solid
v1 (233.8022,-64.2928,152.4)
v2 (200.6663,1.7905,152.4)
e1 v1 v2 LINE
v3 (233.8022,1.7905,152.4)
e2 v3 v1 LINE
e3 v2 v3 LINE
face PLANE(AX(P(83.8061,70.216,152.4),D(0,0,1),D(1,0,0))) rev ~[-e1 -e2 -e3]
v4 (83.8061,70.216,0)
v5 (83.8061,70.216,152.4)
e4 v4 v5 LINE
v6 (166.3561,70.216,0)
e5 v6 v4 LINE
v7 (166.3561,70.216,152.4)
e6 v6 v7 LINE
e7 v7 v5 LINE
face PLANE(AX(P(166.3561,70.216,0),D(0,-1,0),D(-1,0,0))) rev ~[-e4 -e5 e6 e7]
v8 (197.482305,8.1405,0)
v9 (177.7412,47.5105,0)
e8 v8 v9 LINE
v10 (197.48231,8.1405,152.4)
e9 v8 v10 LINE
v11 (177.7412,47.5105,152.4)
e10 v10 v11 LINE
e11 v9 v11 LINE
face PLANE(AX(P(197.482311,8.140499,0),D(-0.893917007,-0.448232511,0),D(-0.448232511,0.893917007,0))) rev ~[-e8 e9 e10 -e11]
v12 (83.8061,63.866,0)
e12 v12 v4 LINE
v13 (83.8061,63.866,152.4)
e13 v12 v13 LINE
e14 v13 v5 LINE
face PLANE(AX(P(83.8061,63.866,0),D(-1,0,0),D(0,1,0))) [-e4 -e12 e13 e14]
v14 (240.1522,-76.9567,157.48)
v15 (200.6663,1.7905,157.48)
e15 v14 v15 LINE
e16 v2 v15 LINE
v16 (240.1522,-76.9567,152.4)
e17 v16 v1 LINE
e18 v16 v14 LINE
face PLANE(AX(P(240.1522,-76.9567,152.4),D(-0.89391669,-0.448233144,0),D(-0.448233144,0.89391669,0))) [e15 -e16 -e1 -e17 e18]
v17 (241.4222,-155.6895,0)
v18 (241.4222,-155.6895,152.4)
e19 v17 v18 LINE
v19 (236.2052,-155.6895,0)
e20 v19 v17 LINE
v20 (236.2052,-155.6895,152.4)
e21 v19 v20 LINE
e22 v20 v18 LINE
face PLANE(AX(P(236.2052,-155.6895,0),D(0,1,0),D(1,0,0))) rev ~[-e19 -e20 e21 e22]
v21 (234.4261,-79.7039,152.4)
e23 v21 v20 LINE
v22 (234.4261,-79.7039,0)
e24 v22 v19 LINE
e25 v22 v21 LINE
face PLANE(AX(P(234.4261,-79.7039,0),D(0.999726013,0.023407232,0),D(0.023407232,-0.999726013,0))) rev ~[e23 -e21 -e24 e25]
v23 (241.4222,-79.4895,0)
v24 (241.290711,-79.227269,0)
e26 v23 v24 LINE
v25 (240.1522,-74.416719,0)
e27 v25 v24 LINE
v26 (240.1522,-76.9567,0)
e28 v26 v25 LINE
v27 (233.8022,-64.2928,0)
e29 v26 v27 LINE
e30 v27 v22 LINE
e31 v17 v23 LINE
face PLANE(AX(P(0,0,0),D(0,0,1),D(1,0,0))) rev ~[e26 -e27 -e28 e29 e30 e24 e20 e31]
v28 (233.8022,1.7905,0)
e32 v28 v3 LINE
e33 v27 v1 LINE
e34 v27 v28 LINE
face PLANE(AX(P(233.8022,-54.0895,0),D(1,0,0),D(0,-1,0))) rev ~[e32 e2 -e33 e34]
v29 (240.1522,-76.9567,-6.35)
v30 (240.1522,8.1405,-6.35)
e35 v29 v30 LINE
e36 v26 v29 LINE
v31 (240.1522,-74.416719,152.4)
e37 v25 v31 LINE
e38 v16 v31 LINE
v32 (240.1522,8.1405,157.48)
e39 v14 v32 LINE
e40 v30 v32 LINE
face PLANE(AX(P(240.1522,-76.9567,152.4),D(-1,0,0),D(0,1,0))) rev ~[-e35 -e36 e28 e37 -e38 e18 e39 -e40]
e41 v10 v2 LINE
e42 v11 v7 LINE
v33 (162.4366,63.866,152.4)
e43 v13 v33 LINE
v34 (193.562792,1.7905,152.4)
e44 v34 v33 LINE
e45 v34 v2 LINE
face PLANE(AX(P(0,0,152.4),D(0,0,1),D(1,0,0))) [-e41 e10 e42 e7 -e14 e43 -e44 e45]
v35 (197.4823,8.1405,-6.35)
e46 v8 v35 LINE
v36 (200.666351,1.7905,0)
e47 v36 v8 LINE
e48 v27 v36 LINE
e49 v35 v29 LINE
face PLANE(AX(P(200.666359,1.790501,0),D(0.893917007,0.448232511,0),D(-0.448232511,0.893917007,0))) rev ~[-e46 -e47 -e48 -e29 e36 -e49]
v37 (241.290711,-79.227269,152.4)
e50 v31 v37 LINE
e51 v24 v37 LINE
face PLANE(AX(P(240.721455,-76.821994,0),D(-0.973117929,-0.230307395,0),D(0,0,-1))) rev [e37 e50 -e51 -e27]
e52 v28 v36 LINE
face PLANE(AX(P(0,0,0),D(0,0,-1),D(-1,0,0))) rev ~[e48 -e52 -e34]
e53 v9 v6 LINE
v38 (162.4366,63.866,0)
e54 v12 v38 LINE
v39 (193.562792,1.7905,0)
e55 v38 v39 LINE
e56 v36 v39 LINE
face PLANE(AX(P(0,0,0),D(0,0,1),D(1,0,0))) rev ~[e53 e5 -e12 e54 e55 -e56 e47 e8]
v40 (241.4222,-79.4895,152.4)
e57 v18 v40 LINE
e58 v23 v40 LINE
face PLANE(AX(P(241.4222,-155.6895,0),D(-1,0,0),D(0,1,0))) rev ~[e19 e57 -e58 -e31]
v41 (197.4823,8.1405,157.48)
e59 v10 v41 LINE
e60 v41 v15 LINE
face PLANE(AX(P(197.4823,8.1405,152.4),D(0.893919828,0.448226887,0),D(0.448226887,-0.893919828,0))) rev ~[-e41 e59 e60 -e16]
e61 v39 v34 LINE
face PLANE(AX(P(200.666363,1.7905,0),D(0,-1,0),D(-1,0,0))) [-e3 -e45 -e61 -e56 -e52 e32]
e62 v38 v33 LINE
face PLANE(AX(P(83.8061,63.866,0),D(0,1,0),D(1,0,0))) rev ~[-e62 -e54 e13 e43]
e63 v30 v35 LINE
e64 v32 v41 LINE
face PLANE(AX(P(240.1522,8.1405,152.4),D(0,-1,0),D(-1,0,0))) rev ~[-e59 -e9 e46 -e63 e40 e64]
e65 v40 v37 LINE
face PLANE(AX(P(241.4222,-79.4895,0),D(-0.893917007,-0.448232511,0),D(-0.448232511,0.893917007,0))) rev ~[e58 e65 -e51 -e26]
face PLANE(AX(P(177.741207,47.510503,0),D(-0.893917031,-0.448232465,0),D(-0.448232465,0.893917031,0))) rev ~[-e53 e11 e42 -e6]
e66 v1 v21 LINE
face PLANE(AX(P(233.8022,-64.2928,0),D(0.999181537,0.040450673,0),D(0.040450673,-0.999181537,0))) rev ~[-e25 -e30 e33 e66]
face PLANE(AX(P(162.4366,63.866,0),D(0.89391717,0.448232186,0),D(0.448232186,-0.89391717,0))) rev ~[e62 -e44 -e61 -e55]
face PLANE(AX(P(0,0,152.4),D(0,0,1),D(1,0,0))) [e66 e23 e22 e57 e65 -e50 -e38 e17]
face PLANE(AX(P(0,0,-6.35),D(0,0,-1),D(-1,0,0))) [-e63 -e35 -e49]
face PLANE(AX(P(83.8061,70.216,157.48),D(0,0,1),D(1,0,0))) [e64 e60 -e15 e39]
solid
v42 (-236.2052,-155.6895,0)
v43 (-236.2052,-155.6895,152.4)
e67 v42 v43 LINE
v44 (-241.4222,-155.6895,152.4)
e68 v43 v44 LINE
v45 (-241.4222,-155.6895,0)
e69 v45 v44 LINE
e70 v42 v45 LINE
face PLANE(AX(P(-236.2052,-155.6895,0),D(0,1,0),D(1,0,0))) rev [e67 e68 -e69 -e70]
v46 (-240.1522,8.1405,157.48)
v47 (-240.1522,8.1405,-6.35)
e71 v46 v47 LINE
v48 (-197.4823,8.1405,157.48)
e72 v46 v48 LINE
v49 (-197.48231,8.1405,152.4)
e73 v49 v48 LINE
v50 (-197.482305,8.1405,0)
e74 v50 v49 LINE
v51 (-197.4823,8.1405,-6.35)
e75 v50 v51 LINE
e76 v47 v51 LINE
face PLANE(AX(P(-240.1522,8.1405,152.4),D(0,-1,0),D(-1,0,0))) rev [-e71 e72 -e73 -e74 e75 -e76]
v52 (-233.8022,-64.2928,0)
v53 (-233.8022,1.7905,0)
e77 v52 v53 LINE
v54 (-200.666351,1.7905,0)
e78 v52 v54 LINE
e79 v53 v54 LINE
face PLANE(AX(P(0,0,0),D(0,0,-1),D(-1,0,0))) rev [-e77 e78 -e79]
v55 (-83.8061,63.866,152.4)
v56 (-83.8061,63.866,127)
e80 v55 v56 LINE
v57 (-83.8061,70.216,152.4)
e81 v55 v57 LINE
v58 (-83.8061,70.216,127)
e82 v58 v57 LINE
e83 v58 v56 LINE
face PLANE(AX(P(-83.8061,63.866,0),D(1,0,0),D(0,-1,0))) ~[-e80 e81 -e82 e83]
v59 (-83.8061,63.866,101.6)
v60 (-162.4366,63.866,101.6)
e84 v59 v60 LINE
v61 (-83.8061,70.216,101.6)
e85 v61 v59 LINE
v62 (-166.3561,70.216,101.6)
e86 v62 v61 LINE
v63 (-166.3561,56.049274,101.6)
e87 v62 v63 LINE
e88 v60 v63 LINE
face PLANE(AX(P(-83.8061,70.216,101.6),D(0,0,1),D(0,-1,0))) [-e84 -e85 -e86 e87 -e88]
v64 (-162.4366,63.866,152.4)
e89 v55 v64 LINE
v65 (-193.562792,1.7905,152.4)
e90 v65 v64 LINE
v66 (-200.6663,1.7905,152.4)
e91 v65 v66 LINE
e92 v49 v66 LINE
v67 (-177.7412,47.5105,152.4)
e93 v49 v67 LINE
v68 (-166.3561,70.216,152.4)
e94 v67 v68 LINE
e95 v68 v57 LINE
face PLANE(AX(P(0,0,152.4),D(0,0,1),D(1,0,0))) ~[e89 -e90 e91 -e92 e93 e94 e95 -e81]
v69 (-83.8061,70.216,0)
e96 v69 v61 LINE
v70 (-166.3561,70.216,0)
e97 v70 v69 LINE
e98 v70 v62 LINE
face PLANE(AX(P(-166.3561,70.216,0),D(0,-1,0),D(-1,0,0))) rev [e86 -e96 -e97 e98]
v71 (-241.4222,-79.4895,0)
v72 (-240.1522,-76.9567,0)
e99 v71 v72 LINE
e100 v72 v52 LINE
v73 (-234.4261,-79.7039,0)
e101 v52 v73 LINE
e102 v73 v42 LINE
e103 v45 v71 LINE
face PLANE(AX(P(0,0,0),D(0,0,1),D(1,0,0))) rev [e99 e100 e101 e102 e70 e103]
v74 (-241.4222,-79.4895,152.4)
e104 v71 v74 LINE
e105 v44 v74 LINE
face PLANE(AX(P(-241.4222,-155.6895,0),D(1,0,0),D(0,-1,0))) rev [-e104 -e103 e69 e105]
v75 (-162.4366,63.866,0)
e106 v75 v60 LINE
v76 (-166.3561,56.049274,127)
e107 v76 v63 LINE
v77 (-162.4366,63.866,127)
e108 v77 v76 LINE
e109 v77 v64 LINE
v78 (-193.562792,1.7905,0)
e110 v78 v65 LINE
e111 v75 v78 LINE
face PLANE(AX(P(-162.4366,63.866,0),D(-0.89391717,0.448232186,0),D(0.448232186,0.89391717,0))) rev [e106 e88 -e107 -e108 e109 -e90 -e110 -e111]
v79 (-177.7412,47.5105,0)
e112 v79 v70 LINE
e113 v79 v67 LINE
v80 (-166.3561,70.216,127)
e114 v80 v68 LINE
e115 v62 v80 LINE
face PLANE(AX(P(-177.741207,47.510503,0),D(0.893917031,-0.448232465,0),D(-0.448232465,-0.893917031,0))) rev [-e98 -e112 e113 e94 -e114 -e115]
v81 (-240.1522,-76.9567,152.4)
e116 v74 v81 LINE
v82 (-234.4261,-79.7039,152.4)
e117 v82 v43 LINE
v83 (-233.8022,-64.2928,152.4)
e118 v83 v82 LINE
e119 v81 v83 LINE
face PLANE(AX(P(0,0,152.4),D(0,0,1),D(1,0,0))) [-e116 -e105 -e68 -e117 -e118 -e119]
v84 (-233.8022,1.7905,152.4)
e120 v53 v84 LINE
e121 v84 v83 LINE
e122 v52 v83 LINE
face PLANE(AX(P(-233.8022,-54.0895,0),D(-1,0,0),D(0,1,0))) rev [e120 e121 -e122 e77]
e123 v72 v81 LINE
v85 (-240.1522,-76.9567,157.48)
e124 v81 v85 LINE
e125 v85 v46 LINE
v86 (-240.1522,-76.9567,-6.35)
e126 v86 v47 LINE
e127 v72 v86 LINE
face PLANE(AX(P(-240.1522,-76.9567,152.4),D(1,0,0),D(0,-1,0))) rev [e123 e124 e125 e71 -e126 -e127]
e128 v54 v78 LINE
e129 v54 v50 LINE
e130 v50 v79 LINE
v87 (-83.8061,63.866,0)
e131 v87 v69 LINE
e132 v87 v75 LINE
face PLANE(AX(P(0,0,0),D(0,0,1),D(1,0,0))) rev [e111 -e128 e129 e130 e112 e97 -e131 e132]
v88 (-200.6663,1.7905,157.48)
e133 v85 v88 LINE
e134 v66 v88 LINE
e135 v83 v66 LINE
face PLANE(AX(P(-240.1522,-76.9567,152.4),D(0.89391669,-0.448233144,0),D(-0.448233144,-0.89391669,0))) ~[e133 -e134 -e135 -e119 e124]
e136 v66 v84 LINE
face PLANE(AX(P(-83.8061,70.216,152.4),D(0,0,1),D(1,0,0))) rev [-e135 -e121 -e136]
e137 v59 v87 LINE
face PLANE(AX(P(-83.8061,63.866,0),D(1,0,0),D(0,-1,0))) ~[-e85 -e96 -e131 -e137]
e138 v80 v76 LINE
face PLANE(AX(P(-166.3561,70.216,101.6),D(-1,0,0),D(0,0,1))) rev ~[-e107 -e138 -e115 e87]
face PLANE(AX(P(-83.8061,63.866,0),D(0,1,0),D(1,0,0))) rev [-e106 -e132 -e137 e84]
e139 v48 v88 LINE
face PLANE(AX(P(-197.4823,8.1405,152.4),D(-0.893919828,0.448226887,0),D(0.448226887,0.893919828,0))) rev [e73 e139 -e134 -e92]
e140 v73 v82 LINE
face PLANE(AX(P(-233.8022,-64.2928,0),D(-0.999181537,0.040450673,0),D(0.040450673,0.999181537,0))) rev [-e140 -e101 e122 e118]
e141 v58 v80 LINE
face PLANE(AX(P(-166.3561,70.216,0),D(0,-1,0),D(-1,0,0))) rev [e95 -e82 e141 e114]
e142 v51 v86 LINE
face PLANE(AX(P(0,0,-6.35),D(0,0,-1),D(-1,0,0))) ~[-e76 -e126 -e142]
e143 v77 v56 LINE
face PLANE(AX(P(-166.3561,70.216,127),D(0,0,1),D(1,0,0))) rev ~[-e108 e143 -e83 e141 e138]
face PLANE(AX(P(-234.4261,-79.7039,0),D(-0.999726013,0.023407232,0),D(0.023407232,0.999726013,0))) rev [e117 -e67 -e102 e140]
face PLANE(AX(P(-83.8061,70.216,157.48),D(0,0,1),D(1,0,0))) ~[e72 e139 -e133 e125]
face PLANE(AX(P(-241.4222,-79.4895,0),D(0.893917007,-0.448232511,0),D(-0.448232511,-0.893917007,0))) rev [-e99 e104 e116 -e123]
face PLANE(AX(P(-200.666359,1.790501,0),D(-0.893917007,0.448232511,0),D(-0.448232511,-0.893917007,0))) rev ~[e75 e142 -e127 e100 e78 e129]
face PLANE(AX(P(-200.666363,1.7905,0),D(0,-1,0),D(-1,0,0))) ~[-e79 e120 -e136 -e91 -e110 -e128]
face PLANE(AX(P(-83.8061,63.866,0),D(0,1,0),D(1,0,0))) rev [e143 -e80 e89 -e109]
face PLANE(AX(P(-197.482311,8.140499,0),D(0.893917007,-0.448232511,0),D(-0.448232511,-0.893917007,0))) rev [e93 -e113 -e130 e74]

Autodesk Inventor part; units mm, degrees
ref_plane "YZ Plane" through (0, 0, 0) normal (1, 0, 0) x (0, 1, 0)
ref_plane "Work Plane2" through (0, 0, 0) normal (0, 0, 1) x (1, 0, 0)
sketch "Sketch2" plane through (0, 0, 0) normal (0, 0, 1) x (1, 0, 0)
  line L0 (162.4366, 63.866) -> (234.4261, -79.7039) projected
  line L1 (241.4222, -79.4895) -> (177.7412, 47.5105) projected
  line L2 (-228.4778, -3.2895) -> (228.7222, -3.2895) projected
  line L3 (228.7222, -3.2895) -> (228.7222, -54.0895) projected
  line L4 (-228.4778, -3.2895) -> (-228.4778, -54.0895) projected
  line L5 (241.4222, -155.6895) -> (241.4222, -79.4895) projected
  line L6 (241.4222, -79.4895) -> (166.3561, 70.216) projected
  line L7 (166.3561, 70.216) -> (77.4561, 70.216) projected
  line L8 (77.4561, 70.216) -> (77.4561, 47.5105) projected
  line L9 (77.4561, 47.5105) -> (-77.2118, 47.5105) projected
  line L10 (-77.2118, 47.5105) -> (-77.2118, 70.216) projected
  line L11 (-77.2118, 70.216) -> (-166.1118, 70.216) projected
  line L12 (-166.1118, 70.216) -> (-241.1778, -79.4895) projected
  line L13 (-241.1778, -79.4895) -> (-241.1778, -155.6895) projected
  line L14 (-241.1778, -155.6895) -> (-233.8379, -155.6895) projected
  line L15 (-233.8379, -155.6895) -> (-231.9549, -75.263) projected
  line L16 (-231.9549, -75.263) -> (-162.1922, 63.866) projected
  line L17 (-162.1922, 63.866) -> (-83.5618, 63.866) projected
  line L18 (-83.5618, 63.866) -> (-83.5618, 41.1605) projected
  line L19 (-83.5618, 41.1605) -> (83.8061, 41.1605) projected
  line L20 (83.8061, 41.1605) -> (83.8061, 63.866) projected
  line L21 (83.8061, 63.866) -> (162.4366, 63.866) projected
  line L22 (162.4366, 63.866) -> (234.4261, -79.7039) projected
  line L23 (234.4261, -79.7039) -> (236.2052, -155.6895) projected
  line L24 (236.2052, -155.6895) -> (241.4222, -155.6895) projected
  line L25 (233.8022, -54.0895) -> (233.8022, 1.7905)
  line L26 (233.8022, 1.7905) -> (-233.5578, 1.7905)
  line L27 (-233.5578, 1.7905) -> (-233.5578, -54.0895)
  line L28 (240.1522, -54.0895) -> (240.1522, 8.1405)
  line L29 (240.1522, 8.1405) -> (-239.9078, 8.1405)
  line L30 (-239.9078, 8.1405) -> (-239.9078, -54.0895)
  line L31 (233.8022, -54.0895) -> (233.8022, -64.2928)
  line L32 (240.1522, -54.0895) -> (240.1522, -76.9567)
  line L33 (233.8022, -64.2928) -> (234.0782, -64.8433)
  line L34 (240.1522, -76.9567) -> (241.4222, -79.4895)
  line L35 (241.4222, -79.4895) -> (241.4222, -155.6895)
  line L36 (241.4222, -155.6895) -> (236.2052, -155.6895)
  line L37 (236.2052, -155.6895) -> (234.4261, -79.7039)
  line L38 (233.8022, -64.2928) -> (234.4261, -79.7039)
  line L39 (83.8061, 63.866) -> (83.8061, 70.216)
  point P0 (0, 0)
  point P1 (197.4823, 8.1405)
  point P2 (193.5628, 1.7905)
  dimension "d0" = 5.08
  dimension "d1" = 6.35
ref_plane "Work Plane3" through (-241.1778, -155.6895, 152.4) normal (0, 0, -1) x (0, 1, 0)
extrude "Extrusion1" add sketch "Sketch2" along normal up to surface (152.4 mm away) contours L21 L39 L7 L6 L1 L29 L0 | L29 L1 L26 L0 | L29 L28 L32 L1 L31 L25 L26 | L38 L1 L5 L24 L23
sketch "Sketch3" plane through (83.8061, 70.216, 152.4) normal (0, 0, 1) x (1, 0, 0)
  line L0 (156.3461, -62.0755) -> (113.6762, -62.0755) projected
  line L1 (156.3461, -147.1727) -> (156.3461, -62.0755) projected
  line L2 (113.6762, -62.0755) -> (156.3461, -62.0755)
  line L3 (157.6161, -149.7055) -> (156.3461, -147.1727) projected
  line L4 (156.3461, -62.0755) -> (156.3461, -147.1727)
  line L5 (156.3461, -147.1727) -> (116.8602, -68.4255)
  line L6 (109.7567, -68.4255) -> (149.9961, -68.4255) projected
  line L7 (113.6762, -62.0755) -> (116.8602, -68.4255)
  point P0 (-83.8061, -70.216)
extrude "Extrusion2" add sketch "Sketch3" along normal blind 5.08
sketch "Sketch4" plane through (0, 0, 0) normal (0, 0, -1) x (-1, 0, 0)
  line L0 (-240.1522, 8.1405) -> (-197.4823, 8.1405) projected
  line L1 (-240.1522, -76.9567) -> (-240.1522, 8.1405) projected
  line L2 (-233.8022, 1.7905) -> (-233.8022, -64.2928) projected
  line L3 (-241.4222, -79.4895) -> (-177.7412, 47.5105) projected
  line L4 (-193.5628, 1.7905) -> (-233.8022, 1.7905) projected
  line L5 (-241.4222, -79.4895) -> (-177.7412, 47.5105) projected
  line L6 (-240.1522, -76.9567) -> (-197.4823, 8.1405)
  line L7 (-240.1522, 8.1405) -> (-197.4823, 8.1405)
  line L8 (-240.1522, 8.1405) -> (-240.1522, -76.9567)
  point P0 (0, 0)
extrude "Extrusion3" add sketch "Sketch4" along normal blind 6.35
chamfer "Chamfer2" distance 2.54 angle 45 1 edges at (240.1522, -76.9567, 76.2)
mirror "Mirror1" about plane through (0, 0, 0) normal (1, 0, 0) of "Extrusion1", "Extrusion3", "Extrusion2"
sketch "Sketch5" plane through (-166.3561, 70.216, 0) normal (0, 1, 0) x (1, 0, 0)
  line L0 (82.55, 0) -> (82.55, -152.4) projected
  line L1 (82.55, -98.2218) -> (122.6635, -98.2218)
  line L2 (122.6635, -98.2218) -> (122.6635, -130.3782)
  line L3 (122.6635, -130.3782) -> (82.55, -130.3782)
  line L4 (82.55, -130.3782) -> (82.55, -98.2218)
  line L5 (21.7357, -104.5718) -> (47.1357, -104.5718) projected
  line L6 (21.7357, -124.0282) -> (47.1357, -124.0282) projected
  point P0 (166.3561, 0)
  dimension "d14" = 6.35
  dimension "d15" = 6.35
extrude "Extrusion5" cut sketch "Sketch5" against normal blind 50.8
sketch "Sketch6" plane through (-166.3561, 70.216, 0) normal (0, 1, 0) x (1, 0, 0)
  line L0 (-62.1217, -101.6) -> (395.0783, -101.6) projected
  line L1 (90.2783, -124.0282) -> (109.3283, -124.0282) projected
  line L2 (90.2783, -129.1082) -> (90.2783, -124.0282) projected
  line L3 (109.3283, -129.1082) -> (90.2783, -129.1082) projected
  line L4 (109.3283, -124.0282) -> (109.3283, -129.1082) projected
  line L5 (-62.1217, -127) -> (395.0783, -127) projected
  line L6 (0, 0) -> (0, -152.4) projected
  line L7 (82.4528, -101.6) -> (0, -101.6)
  line L8 (0, -101.6) -> (0, -127)
  line L9 (0, -127) -> (82.4528, -127)
  line L10 (82.4528, -127) -> (82.4528, -101.6)
  point P0 (166.3561, 0)
  point P1 (0, -101.6)
extrude "Extrusion6" cut sketch "Sketch6" against normal blind 50.8 contours L0 L10 L5 L6
sketch "Sketch7" plane through (-83.8061, 63.866, 0) normal (1, 0, 0) x (0, 0, -1)
  line L0 (-127, 0) -> (-101.6, 0) projected
  line L1 (-127, 6.35) -> (-127, 0) projected
  line L2 (-101.6, 6.35) -> (-127, 6.35) projected
  line L3 (-101.6, 6.35) -> (-101.6, 0) projected
  line L4 (-127, 6.35) -> (-101.6, 6.35)
  line L5 (-101.6, 6.35) -> (-101.6, 0)
  line L6 (-101.6, 0) -> (-127, 0)
  line L7 (-127, 0) -> (-127, 6.35)
  point P0 (0, -63.866)
extrude "Extrusion7" cut sketch "Sketch7" against normal blind 50.8
properties part number "Middle sector"
